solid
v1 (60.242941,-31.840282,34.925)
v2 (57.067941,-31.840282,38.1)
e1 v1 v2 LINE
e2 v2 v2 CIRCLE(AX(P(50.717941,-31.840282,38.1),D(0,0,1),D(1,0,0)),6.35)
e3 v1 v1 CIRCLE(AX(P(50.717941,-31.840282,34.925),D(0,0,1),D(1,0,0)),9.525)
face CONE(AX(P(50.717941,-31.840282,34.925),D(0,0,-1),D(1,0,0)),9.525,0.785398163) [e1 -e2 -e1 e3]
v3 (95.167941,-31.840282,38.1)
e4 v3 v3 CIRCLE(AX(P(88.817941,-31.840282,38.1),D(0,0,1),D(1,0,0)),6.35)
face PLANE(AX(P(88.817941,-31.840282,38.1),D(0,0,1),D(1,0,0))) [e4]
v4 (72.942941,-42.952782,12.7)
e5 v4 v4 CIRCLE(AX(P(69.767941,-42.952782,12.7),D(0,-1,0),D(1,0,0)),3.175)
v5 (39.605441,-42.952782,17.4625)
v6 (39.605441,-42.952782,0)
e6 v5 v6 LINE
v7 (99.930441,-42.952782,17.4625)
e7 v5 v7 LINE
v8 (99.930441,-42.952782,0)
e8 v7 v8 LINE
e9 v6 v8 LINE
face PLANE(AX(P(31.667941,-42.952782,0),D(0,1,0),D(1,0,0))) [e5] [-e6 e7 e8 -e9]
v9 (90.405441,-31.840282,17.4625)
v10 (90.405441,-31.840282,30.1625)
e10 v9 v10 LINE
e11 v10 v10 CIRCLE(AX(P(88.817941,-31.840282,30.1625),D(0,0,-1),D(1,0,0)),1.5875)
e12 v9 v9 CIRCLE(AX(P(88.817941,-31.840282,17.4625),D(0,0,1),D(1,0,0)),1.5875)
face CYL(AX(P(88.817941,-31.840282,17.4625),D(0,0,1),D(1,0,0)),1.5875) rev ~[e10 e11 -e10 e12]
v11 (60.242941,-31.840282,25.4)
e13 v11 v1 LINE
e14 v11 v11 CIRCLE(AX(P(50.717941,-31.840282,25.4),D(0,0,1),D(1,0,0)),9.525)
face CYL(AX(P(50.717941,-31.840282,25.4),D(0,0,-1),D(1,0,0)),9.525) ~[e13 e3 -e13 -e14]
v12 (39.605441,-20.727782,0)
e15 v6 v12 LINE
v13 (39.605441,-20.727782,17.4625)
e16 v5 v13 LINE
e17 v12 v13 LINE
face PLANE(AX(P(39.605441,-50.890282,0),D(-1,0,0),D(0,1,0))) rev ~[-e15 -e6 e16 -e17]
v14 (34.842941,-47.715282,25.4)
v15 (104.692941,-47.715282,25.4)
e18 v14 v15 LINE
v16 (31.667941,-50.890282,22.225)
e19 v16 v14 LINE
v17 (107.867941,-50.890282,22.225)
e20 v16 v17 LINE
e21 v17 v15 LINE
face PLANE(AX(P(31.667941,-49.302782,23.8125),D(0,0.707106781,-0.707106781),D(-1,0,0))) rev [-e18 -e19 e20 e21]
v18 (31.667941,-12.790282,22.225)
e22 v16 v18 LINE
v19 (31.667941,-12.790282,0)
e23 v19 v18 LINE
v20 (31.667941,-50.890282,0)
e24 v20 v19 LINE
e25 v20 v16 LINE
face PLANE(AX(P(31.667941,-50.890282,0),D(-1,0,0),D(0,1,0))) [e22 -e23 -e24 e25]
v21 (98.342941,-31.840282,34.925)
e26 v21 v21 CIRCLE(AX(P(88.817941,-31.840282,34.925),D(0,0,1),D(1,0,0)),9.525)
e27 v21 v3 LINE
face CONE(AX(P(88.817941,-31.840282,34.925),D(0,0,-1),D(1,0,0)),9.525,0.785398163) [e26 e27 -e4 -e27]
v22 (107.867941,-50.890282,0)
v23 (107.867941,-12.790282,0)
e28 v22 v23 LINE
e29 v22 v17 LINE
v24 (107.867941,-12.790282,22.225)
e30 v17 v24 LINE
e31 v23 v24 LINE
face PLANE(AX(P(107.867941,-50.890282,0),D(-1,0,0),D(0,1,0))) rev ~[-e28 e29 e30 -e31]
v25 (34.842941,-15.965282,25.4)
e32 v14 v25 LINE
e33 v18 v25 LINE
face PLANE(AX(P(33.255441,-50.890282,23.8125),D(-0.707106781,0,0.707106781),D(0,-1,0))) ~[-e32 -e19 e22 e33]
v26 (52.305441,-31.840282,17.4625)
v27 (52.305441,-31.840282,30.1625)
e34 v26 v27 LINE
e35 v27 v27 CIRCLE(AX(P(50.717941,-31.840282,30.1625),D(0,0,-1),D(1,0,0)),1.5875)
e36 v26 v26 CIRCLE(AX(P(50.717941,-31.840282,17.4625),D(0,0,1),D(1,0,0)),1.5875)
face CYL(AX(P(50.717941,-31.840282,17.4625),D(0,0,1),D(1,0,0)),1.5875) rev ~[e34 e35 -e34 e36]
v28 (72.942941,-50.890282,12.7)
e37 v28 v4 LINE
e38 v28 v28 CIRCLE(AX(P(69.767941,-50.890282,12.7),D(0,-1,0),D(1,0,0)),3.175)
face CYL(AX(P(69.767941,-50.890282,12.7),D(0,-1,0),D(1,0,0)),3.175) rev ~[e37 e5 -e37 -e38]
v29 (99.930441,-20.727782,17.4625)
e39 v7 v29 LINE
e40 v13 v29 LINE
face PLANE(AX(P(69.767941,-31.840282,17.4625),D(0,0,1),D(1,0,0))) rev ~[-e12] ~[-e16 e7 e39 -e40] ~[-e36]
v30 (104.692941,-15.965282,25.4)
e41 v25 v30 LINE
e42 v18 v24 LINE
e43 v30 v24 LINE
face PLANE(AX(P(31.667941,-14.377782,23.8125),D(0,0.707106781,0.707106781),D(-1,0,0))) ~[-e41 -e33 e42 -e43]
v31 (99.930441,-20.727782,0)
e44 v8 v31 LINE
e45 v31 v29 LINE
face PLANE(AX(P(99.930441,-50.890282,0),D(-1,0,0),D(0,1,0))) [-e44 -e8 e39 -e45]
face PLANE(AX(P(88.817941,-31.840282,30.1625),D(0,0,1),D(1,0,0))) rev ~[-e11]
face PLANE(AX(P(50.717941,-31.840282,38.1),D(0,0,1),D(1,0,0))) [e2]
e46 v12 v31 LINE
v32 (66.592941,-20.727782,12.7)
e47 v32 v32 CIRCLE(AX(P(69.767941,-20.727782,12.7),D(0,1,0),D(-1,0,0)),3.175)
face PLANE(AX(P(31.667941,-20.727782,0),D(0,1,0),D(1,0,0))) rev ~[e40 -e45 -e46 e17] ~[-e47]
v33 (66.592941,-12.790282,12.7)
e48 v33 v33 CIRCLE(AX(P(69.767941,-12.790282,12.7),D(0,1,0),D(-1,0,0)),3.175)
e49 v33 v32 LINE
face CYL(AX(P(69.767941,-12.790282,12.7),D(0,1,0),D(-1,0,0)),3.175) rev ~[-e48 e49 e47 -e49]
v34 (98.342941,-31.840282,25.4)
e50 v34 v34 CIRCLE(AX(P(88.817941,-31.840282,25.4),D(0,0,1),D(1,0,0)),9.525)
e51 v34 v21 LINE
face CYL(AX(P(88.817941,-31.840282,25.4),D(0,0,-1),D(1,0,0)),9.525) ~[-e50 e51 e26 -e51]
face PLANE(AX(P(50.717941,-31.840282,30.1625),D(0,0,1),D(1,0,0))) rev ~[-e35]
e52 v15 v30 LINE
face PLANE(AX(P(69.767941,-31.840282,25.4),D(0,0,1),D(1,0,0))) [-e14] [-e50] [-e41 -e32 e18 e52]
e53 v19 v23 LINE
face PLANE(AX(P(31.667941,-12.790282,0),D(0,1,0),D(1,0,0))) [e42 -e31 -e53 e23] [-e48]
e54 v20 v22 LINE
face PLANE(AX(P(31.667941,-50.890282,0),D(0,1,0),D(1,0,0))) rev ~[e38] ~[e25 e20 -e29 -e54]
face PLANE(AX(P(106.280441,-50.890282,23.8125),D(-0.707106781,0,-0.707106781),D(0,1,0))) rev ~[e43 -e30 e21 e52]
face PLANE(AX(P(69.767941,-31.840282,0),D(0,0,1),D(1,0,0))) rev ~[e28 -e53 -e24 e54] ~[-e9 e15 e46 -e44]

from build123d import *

# Parameters (mm, degrees)
F0_W     = 76.2
F0_H     = 38.1
F1_DEPTH = 25.4
F2_R     = 9.525
F3_DEPTH = 12.7
F4_SIZE  = 3.175
F5_T     = 7.9375
F6_R     = 3.175
F7_DEPTH = 7.9375
F8_R     = 3.175
F9_DEPTH = 7.9375


# Not quite as in the source:
# - a length typed as a fraction of an inch, garbled in the dataset ("3 / 203.2 mm" for 3/8 in), is restored
# - a shell that OpenCascade refuses in one call is made with other operations: the cavity is built on its own and cut out


with BuildPart() as f1:
    # F0 (on Top) → F1 (new body)
    with BuildSketch(Plane.XY):
        with Locations((69.7679412603, -31.8402817965)):
            Rectangle(F0_W, F0_H)
    extrude(amount=F1_DEPTH)

    # F2 (on face) → F3 (join)
    with BuildSketch(Plane.XY.offset(25.4)):
        with Locations((88.8179412603, -31.8402817965)):
            Circle(F2_R)
        with Locations((50.7179412603, -31.8402817965)):
            Circle(F2_R)
    extrude(amount=F3_DEPTH)

    # F4
    f4_edges = [f1.edges().sort_by_distance(p)[0] for p in [
        (41.192941, -31.840282, 38.1),
        (79.292941, -31.840282, 38.1),
        (69.767941, -50.890282, 25.4),
        (31.667941, -31.840282, 25.4),
        (107.867941, -31.840282, 25.4),
        (69.767941, -12.790282, 25.4),
    ]]
    chamfer(f4_edges, length=F4_SIZE)

    # F5: shell of thickness 7.9375, made by hand


with BuildPart() as f5_core1:
    # F5_t2: copy of F1
    add(f1.part)

    # the walls: a layer under each face that stays
    f5_faces = [f5_core1.faces().sort_by_distance(p)[0] for p in [
        (69.7679412603, -12.7902817965, 11.1125),
        (107.8679412603, -31.8402817965, 11.1125),
        (69.7679412603, -14.3777817965, 23.8125),
        (31.6679412603, -31.8402817965, 11.1125),
        (69.7679412603, -50.8902817965, 11.1125),
        (106.2804412603, -31.8402817965, 23.8125),
        (69.7679412603, -31.8402817965, 25.4),
        (33.2554412603, -31.8402817965, 23.8125),
        (69.7679412603, -49.3027817965, 23.8125),
        (41.1929412603, -31.8402817965, 30.1625),
        (79.2929412603, -31.8402817965, 30.1625),
        (42.7804412603, -31.8402817965, 36.5125),
        (80.8804412603, -31.8402817965, 36.5125),
        (50.7179412603, -31.8402817965, 38.1),
        (88.8179412603, -31.8402817965, 38.1),
    ]]
    thicken(f5_faces, amount=-F5_T, mode=Mode.SUBTRACT)

    # F5_s3 → F5_t4 (revolve, cut)
    with BuildSketch(Plane.XZ.offset(31.8402817965)):
        Polygon((60.3223162603, 25.479375), (60.2429412603, 17.4625), (52.3054412603, 17.4625), (52.3054412603, 25.4), align=None)
    revolve(axis=Axis((50.7179412603, -31.8402817965, 25.4), (0, 0, 1)), mode=Mode.SUBTRACT)

    # F5_s5 → F5_t6 (revolve, cut)
    with BuildSketch(Plane.XZ.offset(31.8402817965)):
        Polygon((98.4223162603, 25.479375), (98.3429412603, 17.4625), (90.4054412603, 17.4625), (90.4054412603, 25.4), align=None)
    revolve(axis=Axis((88.8179412603, -31.8402817965, 25.4), (0, 0, 1)), mode=Mode.SUBTRACT)


with BuildPart() as f1_1:
    add(f1.part)

    # what is left inside the walls is the cavity
    f5_cavity = [f5_core1.part.solids().sort_by_distance(p)[0] for p in [
        (69.767941, -35.544448, 0.079375),
    ]]
    add(f5_cavity, mode=Mode.SUBTRACT)

    # F6 (on face) → F7 (cut)
    with BuildSketch(Plane(origin=(0, -12.7902817965, 0), x_dir=(-1, 0, 0), z_dir=(0, 1, 0))):
        with Locations((-69.7679412603, 12.7)):
            Circle(F6_R)
    extrude(amount=-F7_DEPTH, mode=Mode.SUBTRACT)

    # F8 (on face) → F9 (cut)
    with BuildSketch(Plane.XZ.offset(50.8902817965)):
        with Locations((69.7679412603, 12.7)):
            Circle(F8_R)
    extrude(amount=-F9_DEPTH, mode=Mode.SUBTRACT)


solid = f1_1.part
